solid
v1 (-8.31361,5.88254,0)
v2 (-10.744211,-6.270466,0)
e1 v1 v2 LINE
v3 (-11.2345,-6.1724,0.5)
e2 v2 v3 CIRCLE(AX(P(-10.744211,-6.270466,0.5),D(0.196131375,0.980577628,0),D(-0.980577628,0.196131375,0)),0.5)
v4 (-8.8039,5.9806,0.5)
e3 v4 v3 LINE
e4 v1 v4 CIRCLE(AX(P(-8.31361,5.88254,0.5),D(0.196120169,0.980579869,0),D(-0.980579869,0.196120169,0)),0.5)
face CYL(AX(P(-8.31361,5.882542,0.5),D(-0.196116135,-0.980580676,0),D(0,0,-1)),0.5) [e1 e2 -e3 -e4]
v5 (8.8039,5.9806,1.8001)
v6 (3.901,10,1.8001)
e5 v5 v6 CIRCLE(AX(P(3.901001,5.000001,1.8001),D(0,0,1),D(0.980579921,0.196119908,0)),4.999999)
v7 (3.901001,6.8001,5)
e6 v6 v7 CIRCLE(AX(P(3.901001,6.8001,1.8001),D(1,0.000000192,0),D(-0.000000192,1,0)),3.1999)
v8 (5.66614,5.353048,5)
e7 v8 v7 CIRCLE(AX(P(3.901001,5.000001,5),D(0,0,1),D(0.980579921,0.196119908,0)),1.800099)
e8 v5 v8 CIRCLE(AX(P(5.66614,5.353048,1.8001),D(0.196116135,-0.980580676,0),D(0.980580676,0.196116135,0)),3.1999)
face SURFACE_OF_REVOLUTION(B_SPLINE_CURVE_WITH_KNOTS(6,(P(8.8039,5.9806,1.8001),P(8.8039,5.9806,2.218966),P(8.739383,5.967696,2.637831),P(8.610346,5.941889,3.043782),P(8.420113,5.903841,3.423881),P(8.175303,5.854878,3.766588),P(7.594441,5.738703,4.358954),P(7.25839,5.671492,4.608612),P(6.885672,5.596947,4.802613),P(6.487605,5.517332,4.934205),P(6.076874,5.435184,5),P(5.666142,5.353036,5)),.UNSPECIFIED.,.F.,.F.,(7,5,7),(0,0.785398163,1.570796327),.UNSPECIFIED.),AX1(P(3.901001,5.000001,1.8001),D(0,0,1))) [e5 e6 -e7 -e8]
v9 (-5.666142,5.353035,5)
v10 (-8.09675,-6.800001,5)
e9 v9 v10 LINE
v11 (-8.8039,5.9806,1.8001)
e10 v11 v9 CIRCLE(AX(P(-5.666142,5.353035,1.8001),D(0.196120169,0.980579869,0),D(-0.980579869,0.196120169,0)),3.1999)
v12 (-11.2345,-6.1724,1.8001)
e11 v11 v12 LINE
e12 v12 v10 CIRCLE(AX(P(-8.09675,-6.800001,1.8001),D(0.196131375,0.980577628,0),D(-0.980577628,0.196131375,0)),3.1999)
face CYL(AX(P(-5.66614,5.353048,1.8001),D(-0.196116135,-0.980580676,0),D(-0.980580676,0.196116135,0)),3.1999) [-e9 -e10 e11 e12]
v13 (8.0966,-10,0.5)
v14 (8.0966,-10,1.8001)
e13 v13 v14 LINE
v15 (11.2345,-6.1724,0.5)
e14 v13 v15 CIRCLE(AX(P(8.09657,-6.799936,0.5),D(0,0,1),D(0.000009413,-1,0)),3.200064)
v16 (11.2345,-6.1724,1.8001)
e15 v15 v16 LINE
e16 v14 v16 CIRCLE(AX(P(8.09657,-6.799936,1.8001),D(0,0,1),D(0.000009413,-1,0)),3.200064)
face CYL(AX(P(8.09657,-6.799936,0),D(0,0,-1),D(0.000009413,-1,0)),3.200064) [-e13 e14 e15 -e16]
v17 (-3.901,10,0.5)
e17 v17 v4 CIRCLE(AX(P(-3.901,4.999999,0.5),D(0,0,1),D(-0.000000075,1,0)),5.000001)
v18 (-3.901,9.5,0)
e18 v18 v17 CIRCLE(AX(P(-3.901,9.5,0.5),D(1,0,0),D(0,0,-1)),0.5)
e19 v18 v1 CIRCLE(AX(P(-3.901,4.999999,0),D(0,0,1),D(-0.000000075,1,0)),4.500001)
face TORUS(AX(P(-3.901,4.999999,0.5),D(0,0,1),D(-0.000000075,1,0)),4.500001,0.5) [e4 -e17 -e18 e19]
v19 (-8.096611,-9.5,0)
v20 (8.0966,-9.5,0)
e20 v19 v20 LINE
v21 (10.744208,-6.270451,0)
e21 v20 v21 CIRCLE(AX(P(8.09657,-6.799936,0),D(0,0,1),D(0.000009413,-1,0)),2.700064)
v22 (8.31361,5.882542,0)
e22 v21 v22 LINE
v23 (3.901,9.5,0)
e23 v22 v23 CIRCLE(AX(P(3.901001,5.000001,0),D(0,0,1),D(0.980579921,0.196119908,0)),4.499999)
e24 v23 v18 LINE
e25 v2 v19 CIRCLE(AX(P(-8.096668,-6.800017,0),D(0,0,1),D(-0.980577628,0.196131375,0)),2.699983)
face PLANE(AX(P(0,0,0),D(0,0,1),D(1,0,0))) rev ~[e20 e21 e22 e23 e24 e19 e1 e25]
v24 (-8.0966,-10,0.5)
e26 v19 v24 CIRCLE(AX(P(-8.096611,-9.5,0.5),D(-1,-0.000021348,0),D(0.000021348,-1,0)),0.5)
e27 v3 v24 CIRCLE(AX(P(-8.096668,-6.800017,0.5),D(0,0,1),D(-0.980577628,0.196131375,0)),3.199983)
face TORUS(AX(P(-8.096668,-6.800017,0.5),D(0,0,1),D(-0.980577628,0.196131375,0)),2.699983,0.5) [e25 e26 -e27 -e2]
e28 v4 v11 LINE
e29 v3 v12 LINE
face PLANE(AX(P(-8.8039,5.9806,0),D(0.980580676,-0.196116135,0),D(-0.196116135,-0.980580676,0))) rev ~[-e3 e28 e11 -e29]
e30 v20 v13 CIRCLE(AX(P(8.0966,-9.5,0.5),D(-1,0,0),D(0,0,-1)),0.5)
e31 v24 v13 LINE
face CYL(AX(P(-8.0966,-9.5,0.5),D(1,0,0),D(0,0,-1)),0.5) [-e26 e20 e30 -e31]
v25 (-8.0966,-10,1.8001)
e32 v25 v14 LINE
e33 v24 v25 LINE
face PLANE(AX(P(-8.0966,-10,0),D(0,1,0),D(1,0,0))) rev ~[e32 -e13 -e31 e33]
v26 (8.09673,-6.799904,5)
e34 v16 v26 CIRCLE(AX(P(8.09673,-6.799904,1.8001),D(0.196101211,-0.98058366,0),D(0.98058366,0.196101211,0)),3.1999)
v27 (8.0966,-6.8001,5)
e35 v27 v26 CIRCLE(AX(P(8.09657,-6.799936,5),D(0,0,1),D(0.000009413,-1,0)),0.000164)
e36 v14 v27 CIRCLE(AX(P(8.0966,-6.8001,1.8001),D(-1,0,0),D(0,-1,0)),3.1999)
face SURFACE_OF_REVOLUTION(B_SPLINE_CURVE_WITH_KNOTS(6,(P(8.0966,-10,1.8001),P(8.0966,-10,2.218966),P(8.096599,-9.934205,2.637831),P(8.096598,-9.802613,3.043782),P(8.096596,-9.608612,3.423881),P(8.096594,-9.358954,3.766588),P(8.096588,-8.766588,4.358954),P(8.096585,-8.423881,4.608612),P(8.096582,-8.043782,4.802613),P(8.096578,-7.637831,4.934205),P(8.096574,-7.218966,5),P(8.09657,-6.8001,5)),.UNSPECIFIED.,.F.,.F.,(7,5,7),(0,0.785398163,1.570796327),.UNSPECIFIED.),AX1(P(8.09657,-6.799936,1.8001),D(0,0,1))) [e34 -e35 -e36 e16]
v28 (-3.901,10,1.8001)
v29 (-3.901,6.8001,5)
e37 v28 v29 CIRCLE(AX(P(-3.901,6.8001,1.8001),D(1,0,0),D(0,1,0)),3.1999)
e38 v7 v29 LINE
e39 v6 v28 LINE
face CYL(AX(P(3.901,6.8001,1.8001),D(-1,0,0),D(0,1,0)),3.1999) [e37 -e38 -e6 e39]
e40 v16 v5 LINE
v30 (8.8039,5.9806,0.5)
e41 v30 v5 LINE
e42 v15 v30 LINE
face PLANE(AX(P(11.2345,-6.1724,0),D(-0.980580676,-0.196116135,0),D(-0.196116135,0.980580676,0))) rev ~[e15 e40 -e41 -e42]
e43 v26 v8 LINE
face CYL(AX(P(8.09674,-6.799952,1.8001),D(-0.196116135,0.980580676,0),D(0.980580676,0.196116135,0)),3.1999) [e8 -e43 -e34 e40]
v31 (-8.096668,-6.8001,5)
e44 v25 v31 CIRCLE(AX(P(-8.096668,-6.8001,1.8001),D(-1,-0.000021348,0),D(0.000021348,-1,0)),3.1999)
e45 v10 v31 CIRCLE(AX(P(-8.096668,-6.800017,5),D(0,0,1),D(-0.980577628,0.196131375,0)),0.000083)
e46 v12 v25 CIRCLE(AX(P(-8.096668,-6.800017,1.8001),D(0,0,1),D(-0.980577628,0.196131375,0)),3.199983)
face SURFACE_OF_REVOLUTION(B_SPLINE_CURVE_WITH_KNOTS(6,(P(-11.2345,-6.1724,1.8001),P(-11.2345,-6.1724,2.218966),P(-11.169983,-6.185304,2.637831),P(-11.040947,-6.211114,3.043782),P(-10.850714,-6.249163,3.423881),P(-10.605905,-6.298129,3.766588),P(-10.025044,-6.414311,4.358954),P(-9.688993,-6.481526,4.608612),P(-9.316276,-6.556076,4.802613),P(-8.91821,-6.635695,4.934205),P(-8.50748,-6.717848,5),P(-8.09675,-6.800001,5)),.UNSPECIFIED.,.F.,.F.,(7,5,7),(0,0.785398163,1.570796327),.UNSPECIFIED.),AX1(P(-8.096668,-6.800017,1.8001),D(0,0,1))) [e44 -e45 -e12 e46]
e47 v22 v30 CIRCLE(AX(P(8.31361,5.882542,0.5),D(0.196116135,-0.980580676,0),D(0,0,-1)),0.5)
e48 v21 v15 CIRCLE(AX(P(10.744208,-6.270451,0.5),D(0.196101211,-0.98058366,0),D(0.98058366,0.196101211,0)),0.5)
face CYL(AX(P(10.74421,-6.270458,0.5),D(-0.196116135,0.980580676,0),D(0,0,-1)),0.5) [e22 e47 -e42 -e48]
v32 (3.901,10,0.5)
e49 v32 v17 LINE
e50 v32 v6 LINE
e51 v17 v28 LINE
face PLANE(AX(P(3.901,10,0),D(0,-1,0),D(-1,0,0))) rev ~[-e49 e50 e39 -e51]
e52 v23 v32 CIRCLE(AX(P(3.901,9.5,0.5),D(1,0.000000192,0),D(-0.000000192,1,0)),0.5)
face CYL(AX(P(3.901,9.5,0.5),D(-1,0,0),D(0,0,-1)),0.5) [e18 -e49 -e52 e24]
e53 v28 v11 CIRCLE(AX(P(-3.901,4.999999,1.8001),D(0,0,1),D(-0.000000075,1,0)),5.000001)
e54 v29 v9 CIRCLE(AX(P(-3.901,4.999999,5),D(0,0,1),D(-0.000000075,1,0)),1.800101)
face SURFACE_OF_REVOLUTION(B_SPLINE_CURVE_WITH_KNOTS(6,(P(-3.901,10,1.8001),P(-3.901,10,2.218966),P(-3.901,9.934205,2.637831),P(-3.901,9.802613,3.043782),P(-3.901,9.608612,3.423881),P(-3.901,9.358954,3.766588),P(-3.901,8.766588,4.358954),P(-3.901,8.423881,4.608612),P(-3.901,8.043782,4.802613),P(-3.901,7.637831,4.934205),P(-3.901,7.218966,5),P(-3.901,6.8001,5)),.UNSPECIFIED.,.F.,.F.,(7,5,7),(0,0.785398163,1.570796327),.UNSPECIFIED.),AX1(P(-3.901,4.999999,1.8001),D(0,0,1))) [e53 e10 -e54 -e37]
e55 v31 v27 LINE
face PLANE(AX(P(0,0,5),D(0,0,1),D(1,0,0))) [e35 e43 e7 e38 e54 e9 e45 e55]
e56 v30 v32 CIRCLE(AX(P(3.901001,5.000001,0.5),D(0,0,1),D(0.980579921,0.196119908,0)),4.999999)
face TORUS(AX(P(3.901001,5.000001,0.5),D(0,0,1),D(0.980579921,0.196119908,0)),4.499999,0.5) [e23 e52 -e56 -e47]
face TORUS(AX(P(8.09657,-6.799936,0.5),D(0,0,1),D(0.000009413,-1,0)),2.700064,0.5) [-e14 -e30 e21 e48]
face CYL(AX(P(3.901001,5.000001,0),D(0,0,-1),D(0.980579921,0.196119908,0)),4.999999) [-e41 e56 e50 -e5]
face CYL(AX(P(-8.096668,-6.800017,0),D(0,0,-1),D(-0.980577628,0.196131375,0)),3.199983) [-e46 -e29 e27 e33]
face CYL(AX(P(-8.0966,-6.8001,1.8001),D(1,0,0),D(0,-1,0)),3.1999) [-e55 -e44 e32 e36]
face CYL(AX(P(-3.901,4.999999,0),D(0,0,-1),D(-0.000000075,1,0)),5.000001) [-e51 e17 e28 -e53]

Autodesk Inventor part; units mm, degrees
sketch "Sketch_1" plane through (0, 0, 0) normal (0, 0, 1) x (1, 0, 0)
  arc A0 (-11.2345, -6.1724) -> (-8.0966, -10) centre (-8.0966, -6.8) ccw
  line L0 (-8.0966, -10) -> (8.0966, -10)
  arc A1 (8.0966, -10) -> (11.2345, -6.1724) centre (8.0966, -6.8) ccw
  line L1 (11.2345, -6.1724) -> (8.8039, 5.9806)
  arc A2 (8.8039, 5.9806) -> (3.901, 10) centre (3.901, 5) ccw
  line L2 (3.901, 10) -> (-3.901, 10)
  arc A3 (-3.901, 10) -> (-8.8039, 5.9806) centre (-3.901, 5) ccw
  line L3 (-8.8039, 5.9806) -> (-11.2345, -6.1724)
extrude "Extrusion1" add sketch "Sketch_1" along normal blind 5
fillet "Fillet1" radius 3.2 8 edges at (-10.5713, -8.8288, 5) (0, -10, 5) (10.5713, -8.8288, 5) (10.0192, -0.0959, 5) (7.0709, 8.8667, 5) (0, 10, 5) (-7.0709, 8.8667, 5) (-10.0192, -0.0959, 5)
fillet "Fillet2" radius 0.5 8 edges at (-10.5713, -8.8288, 0) (-10.0192, -0.0959, 0) (-7.0709, 8.8667, 0) (0, 10, 0) (7.0709, 8.8667, 0) (10.0192, -0.0959, 0) (10.5713, -8.8288, 0) (0, -10, 0)
ref_plane "EIS_XY" through (0, 0, 0) normal (0, 0, 1) x (1, 0, 0)
ref_plane "EIS_YZ" through (0, 0, 0) normal (1, 0, 0) x (0, 1, 0)
ref_plane "EIS_ZX" through (0, 0, 0) normal (0, 1, 0) x (0, 0, 1)
properties part number "SCHUNK-1352153-Fingereinsatz Typ A Co-act EGP-C"
